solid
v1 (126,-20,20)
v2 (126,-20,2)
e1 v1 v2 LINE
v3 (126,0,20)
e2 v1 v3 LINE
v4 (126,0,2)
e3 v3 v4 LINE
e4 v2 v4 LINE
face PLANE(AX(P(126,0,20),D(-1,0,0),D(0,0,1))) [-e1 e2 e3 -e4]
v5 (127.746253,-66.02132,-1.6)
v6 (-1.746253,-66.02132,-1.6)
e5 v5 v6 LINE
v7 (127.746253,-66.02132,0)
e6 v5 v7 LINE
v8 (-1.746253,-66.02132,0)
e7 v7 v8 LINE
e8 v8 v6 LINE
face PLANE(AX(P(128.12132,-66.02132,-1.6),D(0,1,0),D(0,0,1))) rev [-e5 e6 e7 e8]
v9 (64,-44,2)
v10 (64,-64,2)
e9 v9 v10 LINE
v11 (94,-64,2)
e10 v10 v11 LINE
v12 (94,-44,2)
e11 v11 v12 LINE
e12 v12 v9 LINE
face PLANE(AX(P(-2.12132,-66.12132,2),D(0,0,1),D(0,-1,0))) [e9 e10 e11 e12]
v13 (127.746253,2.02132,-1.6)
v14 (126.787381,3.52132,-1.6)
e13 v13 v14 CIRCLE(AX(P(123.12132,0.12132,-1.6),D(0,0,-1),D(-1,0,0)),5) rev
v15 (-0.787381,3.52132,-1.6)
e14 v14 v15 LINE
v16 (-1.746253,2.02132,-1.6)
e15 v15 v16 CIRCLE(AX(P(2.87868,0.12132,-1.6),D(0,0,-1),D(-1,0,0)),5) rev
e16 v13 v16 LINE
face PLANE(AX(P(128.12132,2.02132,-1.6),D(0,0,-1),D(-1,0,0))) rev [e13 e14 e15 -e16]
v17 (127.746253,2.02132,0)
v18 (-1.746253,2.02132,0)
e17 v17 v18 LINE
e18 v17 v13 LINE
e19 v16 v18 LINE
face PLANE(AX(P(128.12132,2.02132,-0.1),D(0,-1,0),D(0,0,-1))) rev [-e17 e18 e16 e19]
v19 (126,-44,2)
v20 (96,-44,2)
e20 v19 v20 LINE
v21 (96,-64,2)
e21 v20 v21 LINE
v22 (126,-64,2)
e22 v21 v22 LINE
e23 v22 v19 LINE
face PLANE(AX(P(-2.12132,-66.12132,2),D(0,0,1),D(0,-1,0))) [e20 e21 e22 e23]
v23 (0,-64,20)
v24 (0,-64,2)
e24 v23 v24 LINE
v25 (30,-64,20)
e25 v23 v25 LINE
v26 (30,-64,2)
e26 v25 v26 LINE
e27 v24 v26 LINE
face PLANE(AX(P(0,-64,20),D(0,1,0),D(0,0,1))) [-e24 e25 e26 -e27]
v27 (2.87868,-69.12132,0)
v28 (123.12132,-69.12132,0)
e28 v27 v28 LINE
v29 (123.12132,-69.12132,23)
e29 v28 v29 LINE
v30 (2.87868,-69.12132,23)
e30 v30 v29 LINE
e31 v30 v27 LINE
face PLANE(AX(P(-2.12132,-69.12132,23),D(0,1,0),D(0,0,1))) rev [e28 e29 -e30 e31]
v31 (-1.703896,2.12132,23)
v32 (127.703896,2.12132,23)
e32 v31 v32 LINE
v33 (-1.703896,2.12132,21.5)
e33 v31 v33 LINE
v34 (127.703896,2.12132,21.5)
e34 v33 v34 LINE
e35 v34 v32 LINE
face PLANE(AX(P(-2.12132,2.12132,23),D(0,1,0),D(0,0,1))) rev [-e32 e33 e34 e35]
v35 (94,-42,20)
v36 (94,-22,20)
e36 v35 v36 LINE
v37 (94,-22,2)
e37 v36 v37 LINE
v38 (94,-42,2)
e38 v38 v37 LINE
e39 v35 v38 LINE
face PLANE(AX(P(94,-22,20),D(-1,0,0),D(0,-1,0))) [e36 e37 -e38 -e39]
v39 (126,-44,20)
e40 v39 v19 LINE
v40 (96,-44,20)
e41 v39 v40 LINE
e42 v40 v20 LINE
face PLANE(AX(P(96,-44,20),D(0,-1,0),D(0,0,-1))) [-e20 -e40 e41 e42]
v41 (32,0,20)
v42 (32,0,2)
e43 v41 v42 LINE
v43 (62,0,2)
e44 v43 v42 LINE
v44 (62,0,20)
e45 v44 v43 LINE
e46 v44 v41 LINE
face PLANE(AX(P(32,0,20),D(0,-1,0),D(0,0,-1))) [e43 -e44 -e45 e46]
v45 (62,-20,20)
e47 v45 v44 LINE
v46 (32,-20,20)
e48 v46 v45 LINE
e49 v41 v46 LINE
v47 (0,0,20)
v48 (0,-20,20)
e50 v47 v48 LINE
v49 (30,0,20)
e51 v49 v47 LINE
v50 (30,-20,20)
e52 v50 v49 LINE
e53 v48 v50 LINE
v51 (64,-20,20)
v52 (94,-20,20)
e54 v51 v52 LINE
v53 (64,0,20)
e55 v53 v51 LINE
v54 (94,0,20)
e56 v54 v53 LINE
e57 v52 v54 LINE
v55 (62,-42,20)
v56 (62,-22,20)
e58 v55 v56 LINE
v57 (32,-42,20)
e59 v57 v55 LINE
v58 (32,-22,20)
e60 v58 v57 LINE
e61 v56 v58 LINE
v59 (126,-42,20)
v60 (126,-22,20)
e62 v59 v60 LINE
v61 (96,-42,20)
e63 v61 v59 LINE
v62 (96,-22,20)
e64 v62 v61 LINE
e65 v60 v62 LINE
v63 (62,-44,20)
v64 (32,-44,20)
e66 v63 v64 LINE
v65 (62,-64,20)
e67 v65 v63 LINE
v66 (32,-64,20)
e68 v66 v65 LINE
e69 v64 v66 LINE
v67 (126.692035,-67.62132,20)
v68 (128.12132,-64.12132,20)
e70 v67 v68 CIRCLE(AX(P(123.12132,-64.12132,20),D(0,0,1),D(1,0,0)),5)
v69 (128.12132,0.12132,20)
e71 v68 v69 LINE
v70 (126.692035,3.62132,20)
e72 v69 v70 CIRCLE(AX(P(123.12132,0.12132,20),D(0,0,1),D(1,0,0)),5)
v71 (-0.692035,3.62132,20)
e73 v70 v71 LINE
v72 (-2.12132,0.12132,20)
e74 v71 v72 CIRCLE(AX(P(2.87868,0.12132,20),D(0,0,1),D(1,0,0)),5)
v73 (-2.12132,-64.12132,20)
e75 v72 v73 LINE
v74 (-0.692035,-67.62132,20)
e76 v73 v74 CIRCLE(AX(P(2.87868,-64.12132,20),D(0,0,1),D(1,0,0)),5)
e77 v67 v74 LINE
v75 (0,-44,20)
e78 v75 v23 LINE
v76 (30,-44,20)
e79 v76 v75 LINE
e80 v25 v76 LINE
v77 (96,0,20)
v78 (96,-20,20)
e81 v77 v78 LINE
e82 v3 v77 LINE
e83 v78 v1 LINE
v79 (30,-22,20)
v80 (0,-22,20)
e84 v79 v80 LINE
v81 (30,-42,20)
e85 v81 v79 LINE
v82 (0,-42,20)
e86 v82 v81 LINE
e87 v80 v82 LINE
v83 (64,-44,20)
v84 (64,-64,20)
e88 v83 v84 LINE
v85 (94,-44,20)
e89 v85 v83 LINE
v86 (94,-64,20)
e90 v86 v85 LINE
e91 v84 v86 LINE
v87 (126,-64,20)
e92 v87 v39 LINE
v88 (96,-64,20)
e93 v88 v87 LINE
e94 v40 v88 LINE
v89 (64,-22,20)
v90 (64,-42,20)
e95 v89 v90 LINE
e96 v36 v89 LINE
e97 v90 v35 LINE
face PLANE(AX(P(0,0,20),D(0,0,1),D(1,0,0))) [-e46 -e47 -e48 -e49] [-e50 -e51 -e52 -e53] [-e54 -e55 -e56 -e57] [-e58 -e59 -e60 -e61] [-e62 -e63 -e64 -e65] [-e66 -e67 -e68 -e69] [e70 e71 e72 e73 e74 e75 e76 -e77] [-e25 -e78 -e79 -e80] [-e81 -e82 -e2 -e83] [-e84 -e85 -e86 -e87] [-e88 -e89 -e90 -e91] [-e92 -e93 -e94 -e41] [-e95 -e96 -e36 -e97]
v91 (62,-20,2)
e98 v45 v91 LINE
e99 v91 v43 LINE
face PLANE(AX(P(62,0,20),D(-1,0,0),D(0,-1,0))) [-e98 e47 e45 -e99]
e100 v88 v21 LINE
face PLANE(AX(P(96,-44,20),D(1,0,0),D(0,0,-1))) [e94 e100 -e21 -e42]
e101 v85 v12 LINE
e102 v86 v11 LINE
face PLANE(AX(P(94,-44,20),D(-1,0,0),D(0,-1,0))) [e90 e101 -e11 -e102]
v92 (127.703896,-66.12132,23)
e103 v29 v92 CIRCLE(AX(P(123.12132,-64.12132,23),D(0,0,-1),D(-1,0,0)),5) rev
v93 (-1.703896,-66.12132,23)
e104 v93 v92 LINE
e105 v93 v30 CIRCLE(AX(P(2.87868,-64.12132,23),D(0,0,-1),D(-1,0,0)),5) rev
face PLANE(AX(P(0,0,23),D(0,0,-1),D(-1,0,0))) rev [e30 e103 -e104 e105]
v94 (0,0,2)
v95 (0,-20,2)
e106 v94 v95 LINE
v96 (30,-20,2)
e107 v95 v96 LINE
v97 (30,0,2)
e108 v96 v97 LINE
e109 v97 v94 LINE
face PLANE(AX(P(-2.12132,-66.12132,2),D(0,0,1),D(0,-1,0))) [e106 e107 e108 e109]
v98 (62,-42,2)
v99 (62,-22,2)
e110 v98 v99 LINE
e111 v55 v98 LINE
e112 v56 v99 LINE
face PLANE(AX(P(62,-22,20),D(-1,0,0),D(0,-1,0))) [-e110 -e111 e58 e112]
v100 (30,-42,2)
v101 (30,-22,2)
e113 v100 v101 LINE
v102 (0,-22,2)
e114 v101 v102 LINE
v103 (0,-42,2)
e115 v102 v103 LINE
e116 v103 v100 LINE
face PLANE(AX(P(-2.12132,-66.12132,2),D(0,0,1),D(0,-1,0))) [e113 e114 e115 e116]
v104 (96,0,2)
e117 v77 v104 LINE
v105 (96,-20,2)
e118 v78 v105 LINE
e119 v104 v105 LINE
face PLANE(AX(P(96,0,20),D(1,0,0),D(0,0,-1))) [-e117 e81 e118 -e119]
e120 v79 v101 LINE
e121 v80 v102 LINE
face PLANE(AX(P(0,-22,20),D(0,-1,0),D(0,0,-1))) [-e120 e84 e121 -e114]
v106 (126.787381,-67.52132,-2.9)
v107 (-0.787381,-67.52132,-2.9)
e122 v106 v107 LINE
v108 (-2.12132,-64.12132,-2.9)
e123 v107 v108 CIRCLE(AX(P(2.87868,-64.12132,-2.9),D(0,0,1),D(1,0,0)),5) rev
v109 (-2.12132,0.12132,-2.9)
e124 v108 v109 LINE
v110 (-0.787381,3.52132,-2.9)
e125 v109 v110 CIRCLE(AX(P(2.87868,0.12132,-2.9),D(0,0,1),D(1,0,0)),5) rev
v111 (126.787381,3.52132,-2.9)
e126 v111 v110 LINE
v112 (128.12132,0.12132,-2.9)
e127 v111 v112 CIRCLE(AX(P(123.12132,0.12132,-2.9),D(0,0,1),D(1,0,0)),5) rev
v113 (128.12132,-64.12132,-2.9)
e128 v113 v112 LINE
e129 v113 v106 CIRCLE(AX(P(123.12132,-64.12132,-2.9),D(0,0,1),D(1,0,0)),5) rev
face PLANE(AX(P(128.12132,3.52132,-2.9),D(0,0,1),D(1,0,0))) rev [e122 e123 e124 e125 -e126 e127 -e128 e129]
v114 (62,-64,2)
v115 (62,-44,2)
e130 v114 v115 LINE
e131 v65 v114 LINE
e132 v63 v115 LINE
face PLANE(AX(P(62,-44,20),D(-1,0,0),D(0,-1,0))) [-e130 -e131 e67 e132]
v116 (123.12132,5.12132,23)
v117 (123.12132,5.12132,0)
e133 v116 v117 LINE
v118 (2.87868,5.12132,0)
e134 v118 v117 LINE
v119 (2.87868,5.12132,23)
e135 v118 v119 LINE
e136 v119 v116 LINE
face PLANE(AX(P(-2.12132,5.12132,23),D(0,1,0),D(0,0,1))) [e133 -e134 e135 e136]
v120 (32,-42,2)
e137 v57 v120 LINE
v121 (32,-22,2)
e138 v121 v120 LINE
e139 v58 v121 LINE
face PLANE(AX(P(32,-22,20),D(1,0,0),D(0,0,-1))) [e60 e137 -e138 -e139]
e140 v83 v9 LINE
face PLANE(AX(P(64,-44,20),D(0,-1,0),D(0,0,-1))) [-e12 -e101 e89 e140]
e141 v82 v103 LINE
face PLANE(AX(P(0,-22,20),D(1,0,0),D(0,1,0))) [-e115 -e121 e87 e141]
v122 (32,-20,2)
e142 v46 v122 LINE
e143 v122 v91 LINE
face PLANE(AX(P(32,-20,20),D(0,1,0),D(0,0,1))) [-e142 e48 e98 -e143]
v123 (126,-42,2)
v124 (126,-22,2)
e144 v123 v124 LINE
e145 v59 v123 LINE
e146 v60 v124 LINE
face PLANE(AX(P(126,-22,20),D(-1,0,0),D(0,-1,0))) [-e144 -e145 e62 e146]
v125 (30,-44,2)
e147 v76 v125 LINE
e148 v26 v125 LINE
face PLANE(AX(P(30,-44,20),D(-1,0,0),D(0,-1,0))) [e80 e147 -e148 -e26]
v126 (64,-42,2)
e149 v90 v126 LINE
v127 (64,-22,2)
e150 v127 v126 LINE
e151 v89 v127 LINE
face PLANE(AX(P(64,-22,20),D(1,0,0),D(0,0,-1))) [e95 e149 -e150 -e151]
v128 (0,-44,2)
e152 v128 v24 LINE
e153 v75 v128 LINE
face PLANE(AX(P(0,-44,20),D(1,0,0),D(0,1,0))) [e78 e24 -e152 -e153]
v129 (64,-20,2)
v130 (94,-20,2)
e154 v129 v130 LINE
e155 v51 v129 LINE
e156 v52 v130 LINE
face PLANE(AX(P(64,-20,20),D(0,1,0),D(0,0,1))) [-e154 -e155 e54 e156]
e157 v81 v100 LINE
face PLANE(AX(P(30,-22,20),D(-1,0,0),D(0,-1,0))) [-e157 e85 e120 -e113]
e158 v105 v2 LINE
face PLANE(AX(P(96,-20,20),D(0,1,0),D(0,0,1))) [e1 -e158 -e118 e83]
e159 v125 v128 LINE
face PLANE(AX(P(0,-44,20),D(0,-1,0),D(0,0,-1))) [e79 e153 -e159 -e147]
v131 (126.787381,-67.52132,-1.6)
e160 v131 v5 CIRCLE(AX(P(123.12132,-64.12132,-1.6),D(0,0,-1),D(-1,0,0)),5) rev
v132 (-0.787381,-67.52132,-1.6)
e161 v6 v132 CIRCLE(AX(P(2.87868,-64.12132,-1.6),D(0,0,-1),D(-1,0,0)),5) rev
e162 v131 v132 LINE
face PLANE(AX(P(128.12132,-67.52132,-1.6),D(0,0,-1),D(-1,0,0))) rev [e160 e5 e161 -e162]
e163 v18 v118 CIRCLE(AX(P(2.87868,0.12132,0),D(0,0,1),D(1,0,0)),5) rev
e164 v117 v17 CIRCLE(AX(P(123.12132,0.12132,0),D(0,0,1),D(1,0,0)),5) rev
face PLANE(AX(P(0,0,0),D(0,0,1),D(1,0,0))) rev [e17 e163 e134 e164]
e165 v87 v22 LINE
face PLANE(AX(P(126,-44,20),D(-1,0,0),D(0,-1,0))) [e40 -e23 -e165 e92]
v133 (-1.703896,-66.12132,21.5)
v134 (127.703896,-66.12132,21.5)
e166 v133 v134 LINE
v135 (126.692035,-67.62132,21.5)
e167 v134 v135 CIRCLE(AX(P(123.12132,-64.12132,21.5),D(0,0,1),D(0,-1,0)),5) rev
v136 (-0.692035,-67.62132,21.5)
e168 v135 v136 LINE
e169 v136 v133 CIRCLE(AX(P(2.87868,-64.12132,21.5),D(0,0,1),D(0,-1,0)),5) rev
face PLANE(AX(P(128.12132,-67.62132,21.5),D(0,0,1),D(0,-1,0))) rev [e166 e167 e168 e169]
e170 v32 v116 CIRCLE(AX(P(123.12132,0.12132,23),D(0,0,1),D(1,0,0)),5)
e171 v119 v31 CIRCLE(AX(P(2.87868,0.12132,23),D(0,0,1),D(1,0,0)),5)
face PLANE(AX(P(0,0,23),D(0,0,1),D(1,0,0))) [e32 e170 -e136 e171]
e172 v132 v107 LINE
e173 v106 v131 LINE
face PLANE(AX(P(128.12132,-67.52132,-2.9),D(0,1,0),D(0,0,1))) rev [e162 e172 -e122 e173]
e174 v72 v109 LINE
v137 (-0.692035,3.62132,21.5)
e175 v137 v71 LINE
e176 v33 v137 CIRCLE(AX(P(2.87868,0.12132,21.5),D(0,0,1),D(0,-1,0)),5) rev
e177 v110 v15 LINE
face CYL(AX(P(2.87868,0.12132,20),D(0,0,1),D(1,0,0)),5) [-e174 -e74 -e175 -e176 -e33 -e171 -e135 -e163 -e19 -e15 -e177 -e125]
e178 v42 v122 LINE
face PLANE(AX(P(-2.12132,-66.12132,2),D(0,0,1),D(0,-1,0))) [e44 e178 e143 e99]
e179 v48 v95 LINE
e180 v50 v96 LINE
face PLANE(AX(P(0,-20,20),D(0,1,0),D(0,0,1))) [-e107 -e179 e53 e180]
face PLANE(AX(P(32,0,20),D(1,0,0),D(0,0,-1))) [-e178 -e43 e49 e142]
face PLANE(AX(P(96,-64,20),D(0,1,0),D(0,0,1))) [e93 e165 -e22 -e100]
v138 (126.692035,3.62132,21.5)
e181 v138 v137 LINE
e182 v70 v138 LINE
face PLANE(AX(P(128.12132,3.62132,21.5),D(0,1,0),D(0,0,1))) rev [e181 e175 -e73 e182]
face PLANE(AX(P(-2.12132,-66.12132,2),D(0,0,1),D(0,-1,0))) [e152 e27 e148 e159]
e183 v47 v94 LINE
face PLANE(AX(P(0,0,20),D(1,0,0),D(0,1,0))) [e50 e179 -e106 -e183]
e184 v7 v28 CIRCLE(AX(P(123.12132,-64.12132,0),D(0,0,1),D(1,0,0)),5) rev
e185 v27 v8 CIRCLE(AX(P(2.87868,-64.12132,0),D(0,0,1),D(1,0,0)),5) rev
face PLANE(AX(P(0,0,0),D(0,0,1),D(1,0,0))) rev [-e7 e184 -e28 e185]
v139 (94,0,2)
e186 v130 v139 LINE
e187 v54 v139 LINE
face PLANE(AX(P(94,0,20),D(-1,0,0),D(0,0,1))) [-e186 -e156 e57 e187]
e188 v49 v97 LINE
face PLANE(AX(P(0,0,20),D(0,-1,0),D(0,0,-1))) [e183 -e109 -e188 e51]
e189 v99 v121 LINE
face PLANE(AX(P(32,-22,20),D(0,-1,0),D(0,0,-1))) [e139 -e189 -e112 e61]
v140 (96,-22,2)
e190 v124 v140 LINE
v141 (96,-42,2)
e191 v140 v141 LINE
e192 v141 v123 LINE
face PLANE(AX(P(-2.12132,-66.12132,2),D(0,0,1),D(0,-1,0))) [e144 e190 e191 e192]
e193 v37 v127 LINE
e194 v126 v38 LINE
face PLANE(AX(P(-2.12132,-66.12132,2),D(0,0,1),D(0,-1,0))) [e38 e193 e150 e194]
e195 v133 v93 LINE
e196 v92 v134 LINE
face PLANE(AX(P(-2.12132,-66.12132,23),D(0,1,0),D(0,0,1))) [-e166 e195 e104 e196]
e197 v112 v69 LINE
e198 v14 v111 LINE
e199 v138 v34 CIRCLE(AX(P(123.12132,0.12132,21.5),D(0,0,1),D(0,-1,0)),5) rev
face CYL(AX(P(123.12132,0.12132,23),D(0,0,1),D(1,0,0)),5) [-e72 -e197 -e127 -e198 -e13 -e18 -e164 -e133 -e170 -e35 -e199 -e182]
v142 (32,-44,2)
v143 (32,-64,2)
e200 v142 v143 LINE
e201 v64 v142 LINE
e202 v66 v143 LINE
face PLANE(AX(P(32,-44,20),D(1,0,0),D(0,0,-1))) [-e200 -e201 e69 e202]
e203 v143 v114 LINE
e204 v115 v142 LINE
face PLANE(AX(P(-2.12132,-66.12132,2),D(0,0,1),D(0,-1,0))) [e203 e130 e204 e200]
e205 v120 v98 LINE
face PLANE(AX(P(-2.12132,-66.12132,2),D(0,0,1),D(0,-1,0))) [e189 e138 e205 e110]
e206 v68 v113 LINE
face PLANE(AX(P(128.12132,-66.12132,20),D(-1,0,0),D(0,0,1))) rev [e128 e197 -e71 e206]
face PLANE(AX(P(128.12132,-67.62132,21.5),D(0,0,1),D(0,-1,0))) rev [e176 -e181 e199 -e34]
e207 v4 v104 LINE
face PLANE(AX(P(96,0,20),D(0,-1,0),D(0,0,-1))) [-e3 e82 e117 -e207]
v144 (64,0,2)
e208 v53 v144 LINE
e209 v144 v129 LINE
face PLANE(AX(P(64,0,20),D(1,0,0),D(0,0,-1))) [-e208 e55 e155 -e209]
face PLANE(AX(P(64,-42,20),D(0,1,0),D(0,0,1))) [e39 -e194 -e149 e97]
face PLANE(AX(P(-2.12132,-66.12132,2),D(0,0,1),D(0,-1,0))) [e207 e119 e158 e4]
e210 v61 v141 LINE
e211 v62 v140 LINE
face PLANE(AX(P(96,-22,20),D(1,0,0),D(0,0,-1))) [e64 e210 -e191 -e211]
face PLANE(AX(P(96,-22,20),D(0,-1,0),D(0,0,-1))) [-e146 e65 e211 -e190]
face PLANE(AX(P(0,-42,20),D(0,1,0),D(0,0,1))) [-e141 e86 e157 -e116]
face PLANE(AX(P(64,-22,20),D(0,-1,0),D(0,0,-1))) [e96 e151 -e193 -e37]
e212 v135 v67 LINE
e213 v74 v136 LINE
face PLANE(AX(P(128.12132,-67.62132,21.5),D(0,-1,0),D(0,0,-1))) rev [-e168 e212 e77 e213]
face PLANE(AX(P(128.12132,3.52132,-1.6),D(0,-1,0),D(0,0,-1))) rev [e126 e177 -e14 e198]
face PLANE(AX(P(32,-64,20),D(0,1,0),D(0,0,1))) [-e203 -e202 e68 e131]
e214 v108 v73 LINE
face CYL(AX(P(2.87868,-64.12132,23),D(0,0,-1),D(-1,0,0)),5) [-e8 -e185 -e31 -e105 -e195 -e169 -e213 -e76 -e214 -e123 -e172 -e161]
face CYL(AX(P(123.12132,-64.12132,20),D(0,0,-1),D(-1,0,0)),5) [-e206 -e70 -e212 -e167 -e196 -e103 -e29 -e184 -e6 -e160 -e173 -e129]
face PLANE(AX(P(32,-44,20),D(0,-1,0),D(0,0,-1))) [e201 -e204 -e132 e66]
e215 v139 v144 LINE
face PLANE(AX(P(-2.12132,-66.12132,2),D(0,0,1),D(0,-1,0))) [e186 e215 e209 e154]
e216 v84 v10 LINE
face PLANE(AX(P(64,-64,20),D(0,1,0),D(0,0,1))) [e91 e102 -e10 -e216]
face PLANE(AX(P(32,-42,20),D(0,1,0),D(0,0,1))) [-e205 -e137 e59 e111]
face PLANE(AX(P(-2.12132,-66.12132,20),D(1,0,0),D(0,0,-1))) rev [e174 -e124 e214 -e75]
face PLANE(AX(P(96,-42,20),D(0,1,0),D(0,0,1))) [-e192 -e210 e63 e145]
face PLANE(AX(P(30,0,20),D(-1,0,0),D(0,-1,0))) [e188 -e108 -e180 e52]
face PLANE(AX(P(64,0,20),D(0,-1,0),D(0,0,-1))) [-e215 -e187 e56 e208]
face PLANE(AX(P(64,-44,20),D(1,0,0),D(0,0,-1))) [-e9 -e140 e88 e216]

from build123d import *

# Parameters (mm, degrees)
CROQUIS1_W           = 130.242640688
CROQUIS1_H           = 68.242640688
CROQUIS1_W_2         = 30
CROQUIS1_H_2         = 20
CELDAS_DEPTH         = 20
BASE_START           = -128.12132
CROQUIS2_W           = 2
CROQUIS2_H           = 68.242640688
BASE_DEPTH           = 126
EXCEDENTE_DEPTH      = 3
EXCEDENTE_DEPTH_BACK = 20
CROQUIS3_W           = 130.242640688
CROQUIS3_H           = 3
CROQUIS4_W           = 1.5
CROQUIS4_H           = 71.242640688
RANURA_DEPTH         = 150.231036917
PESTA_A_DEPTH        = 130.242641
F_3D_FIX_DEPTH       = 150.23103719
REDONDEO_R           = 5


with BuildPart() as part:
    # Croquis1 → Celdas (new body)
    with BuildSketch(Plane.XY):
        with Locations((63, -32)):
            Rectangle(CROQUIS1_W, CROQUIS1_H)
        with Locations((47, -10)):
            Rectangle(CROQUIS1_W_2, CROQUIS1_H_2, mode=Mode.SUBTRACT)
        with Locations((15, -10)):
            Rectangle(CROQUIS1_W_2, CROQUIS1_H_2, mode=Mode.SUBTRACT)
        with Locations((79, -10)):
            Rectangle(CROQUIS1_W_2, CROQUIS1_H_2, mode=Mode.SUBTRACT)
        with Locations((111, -10)):
            Rectangle(CROQUIS1_W_2, CROQUIS1_H_2, mode=Mode.SUBTRACT)
        with Locations((47, -32)):
            Rectangle(CROQUIS1_W_2, CROQUIS1_H_2, mode=Mode.SUBTRACT)
        with Locations((79, -32)):
            Rectangle(CROQUIS1_W_2, CROQUIS1_H_2, mode=Mode.SUBTRACT)
        with Locations((111, -32)):
            Rectangle(CROQUIS1_W_2, CROQUIS1_H_2, mode=Mode.SUBTRACT)
        with Locations((47, -54)):
            Rectangle(CROQUIS1_W_2, CROQUIS1_H_2, mode=Mode.SUBTRACT)
        with Locations((79, -54)):
            Rectangle(CROQUIS1_W_2, CROQUIS1_H_2, mode=Mode.SUBTRACT)
        with Locations((111, -54)):
            Rectangle(CROQUIS1_W_2, CROQUIS1_H_2, mode=Mode.SUBTRACT)
        with Locations((15, -32)):
            Rectangle(CROQUIS1_W_2, CROQUIS1_H_2, mode=Mode.SUBTRACT)
        with Locations((15, -54)):
            Rectangle(CROQUIS1_W_2, CROQUIS1_H_2, mode=Mode.SUBTRACT)
    extrude(amount=CELDAS_DEPTH)


with BuildPart() as base_tool:
    # Croquis2 → Base (new body)
    with BuildSketch(Plane(origin=(128.121320344, 0, 0), x_dir=(0, 0, -1), z_dir=(1, 0, 0)).offset(BASE_START)):
        with Locations((-1, -32)):
            Rectangle(CROQUIS2_W, CROQUIS2_H)
    extrude(amount=BASE_DEPTH)


with BuildPart() as part_1:
    add(part.part)


with BuildPart() as part_2:
    # Base: joined with base_tool
    add(part_1.part.fuse(base_tool.part, tol=0.00001))

    # Croquis3 → Excedente (add, two sides: drawn at the far end of the back side and taken through both)
    with BuildSketch(Plane.XY.offset(20).offset(-EXCEDENTE_DEPTH_BACK)):
        with Locations((63, -67.621320344)):
            Rectangle(CROQUIS3_W, CROQUIS3_H)
        with Locations((63, 3.621320344)):
            Rectangle(CROQUIS3_W, CROQUIS3_H)
    extrude(amount=EXCEDENTE_DEPTH + EXCEDENTE_DEPTH_BACK)

    # Croquis4 → Ranura (cut, through all)
    with BuildSketch(Plane.ZY.offset(2.121320344)):
        with Locations((20.75, -32)):
            Rectangle(CROQUIS4_W, CROQUIS4_H)
    extrude(amount=-RANURA_DEPTH, mode=Mode.SUBTRACT)

    # Croquis6 → Pestaña (add, through all)
    with BuildSketch(Plane.ZY.offset(2.121320344)):
        Polygon((0, 2.121320344), (0, -66.121320344), (-1.5, -66.121320344), (-1.5, -67.621320344), (-3, -67.621320344), (-3, 3.621320344), (-1.5, 3.621320344), (-1.5, 2.121320344), align=None)
    extrude(amount=-PESTA_A_DEPTH)

    # Croquis7 → 3D-Fix (cut, through all)
    with BuildSketch(Plane.ZY.offset(2.121320344)):
        Polygon((-0.1, 2.021320344), (-1.6, 2.021320344), (-1.6, 3.521320344), (-2.9, 3.521320344), (-2.9, -67.521320344), (-1.6, -67.521320344), (-1.6, -66.021320344), (-0.1, -66.021320344), (0, -66.021320344), (0, -66.121320344), (-1.5, -66.121320344), (-1.5, -67.621320344), (-3, -67.621320344), (-3, 3.621320344), (-1.5, 3.621320344), (-1.5, 2.121320344), (0, 2.121320344), (0, 2.021320344), align=None)
    extrude(amount=-F_3D_FIX_DEPTH, mode=Mode.SUBTRACT)

    # Redondeo
    # the kernel refuses this fillet: 5 mm, written as the material it takes off along each edge
    with BuildSketch(Plane(origin=(128.121320344, 5.121320344, -12.5), x_dir=(0, -1, 0), z_dir=(0, 0, 1)), Plane(origin=(128.121320344, -69.121320344, 35.5), x_dir=(0, 1, 0), z_dir=(0, 0, -1)), Plane(origin=(-2.121320344, -69.121320344, -12.5), x_dir=(0, 1, 0), z_dir=(0, 0, 1))) as redondeo_piece_1:
        with BuildLine():
            CenterArc((REDONDEO_R, -REDONDEO_R), REDONDEO_R, 90, 90)
            Line((0, -REDONDEO_R), (0, 0))
            Line((0, 0), (REDONDEO_R, 0))
        make_face()
    extrude(amount=48, mode=Mode.SUBTRACT)
    with BuildSketch(Plane(origin=(-2.121320344, 5.121320344, 35.5), x_dir=(1, 0, 0), z_dir=(0, 0, -1))) as redondeo_piece_2:
        with BuildLine():
            CenterArc((REDONDEO_R, REDONDEO_R), REDONDEO_R, 180, 90)
            Line((0, REDONDEO_R), (0, 0))
            Line((0, 0), (REDONDEO_R, 0))
        make_face()
    extrude(amount=48, mode=Mode.SUBTRACT)


solid = part_2.part
